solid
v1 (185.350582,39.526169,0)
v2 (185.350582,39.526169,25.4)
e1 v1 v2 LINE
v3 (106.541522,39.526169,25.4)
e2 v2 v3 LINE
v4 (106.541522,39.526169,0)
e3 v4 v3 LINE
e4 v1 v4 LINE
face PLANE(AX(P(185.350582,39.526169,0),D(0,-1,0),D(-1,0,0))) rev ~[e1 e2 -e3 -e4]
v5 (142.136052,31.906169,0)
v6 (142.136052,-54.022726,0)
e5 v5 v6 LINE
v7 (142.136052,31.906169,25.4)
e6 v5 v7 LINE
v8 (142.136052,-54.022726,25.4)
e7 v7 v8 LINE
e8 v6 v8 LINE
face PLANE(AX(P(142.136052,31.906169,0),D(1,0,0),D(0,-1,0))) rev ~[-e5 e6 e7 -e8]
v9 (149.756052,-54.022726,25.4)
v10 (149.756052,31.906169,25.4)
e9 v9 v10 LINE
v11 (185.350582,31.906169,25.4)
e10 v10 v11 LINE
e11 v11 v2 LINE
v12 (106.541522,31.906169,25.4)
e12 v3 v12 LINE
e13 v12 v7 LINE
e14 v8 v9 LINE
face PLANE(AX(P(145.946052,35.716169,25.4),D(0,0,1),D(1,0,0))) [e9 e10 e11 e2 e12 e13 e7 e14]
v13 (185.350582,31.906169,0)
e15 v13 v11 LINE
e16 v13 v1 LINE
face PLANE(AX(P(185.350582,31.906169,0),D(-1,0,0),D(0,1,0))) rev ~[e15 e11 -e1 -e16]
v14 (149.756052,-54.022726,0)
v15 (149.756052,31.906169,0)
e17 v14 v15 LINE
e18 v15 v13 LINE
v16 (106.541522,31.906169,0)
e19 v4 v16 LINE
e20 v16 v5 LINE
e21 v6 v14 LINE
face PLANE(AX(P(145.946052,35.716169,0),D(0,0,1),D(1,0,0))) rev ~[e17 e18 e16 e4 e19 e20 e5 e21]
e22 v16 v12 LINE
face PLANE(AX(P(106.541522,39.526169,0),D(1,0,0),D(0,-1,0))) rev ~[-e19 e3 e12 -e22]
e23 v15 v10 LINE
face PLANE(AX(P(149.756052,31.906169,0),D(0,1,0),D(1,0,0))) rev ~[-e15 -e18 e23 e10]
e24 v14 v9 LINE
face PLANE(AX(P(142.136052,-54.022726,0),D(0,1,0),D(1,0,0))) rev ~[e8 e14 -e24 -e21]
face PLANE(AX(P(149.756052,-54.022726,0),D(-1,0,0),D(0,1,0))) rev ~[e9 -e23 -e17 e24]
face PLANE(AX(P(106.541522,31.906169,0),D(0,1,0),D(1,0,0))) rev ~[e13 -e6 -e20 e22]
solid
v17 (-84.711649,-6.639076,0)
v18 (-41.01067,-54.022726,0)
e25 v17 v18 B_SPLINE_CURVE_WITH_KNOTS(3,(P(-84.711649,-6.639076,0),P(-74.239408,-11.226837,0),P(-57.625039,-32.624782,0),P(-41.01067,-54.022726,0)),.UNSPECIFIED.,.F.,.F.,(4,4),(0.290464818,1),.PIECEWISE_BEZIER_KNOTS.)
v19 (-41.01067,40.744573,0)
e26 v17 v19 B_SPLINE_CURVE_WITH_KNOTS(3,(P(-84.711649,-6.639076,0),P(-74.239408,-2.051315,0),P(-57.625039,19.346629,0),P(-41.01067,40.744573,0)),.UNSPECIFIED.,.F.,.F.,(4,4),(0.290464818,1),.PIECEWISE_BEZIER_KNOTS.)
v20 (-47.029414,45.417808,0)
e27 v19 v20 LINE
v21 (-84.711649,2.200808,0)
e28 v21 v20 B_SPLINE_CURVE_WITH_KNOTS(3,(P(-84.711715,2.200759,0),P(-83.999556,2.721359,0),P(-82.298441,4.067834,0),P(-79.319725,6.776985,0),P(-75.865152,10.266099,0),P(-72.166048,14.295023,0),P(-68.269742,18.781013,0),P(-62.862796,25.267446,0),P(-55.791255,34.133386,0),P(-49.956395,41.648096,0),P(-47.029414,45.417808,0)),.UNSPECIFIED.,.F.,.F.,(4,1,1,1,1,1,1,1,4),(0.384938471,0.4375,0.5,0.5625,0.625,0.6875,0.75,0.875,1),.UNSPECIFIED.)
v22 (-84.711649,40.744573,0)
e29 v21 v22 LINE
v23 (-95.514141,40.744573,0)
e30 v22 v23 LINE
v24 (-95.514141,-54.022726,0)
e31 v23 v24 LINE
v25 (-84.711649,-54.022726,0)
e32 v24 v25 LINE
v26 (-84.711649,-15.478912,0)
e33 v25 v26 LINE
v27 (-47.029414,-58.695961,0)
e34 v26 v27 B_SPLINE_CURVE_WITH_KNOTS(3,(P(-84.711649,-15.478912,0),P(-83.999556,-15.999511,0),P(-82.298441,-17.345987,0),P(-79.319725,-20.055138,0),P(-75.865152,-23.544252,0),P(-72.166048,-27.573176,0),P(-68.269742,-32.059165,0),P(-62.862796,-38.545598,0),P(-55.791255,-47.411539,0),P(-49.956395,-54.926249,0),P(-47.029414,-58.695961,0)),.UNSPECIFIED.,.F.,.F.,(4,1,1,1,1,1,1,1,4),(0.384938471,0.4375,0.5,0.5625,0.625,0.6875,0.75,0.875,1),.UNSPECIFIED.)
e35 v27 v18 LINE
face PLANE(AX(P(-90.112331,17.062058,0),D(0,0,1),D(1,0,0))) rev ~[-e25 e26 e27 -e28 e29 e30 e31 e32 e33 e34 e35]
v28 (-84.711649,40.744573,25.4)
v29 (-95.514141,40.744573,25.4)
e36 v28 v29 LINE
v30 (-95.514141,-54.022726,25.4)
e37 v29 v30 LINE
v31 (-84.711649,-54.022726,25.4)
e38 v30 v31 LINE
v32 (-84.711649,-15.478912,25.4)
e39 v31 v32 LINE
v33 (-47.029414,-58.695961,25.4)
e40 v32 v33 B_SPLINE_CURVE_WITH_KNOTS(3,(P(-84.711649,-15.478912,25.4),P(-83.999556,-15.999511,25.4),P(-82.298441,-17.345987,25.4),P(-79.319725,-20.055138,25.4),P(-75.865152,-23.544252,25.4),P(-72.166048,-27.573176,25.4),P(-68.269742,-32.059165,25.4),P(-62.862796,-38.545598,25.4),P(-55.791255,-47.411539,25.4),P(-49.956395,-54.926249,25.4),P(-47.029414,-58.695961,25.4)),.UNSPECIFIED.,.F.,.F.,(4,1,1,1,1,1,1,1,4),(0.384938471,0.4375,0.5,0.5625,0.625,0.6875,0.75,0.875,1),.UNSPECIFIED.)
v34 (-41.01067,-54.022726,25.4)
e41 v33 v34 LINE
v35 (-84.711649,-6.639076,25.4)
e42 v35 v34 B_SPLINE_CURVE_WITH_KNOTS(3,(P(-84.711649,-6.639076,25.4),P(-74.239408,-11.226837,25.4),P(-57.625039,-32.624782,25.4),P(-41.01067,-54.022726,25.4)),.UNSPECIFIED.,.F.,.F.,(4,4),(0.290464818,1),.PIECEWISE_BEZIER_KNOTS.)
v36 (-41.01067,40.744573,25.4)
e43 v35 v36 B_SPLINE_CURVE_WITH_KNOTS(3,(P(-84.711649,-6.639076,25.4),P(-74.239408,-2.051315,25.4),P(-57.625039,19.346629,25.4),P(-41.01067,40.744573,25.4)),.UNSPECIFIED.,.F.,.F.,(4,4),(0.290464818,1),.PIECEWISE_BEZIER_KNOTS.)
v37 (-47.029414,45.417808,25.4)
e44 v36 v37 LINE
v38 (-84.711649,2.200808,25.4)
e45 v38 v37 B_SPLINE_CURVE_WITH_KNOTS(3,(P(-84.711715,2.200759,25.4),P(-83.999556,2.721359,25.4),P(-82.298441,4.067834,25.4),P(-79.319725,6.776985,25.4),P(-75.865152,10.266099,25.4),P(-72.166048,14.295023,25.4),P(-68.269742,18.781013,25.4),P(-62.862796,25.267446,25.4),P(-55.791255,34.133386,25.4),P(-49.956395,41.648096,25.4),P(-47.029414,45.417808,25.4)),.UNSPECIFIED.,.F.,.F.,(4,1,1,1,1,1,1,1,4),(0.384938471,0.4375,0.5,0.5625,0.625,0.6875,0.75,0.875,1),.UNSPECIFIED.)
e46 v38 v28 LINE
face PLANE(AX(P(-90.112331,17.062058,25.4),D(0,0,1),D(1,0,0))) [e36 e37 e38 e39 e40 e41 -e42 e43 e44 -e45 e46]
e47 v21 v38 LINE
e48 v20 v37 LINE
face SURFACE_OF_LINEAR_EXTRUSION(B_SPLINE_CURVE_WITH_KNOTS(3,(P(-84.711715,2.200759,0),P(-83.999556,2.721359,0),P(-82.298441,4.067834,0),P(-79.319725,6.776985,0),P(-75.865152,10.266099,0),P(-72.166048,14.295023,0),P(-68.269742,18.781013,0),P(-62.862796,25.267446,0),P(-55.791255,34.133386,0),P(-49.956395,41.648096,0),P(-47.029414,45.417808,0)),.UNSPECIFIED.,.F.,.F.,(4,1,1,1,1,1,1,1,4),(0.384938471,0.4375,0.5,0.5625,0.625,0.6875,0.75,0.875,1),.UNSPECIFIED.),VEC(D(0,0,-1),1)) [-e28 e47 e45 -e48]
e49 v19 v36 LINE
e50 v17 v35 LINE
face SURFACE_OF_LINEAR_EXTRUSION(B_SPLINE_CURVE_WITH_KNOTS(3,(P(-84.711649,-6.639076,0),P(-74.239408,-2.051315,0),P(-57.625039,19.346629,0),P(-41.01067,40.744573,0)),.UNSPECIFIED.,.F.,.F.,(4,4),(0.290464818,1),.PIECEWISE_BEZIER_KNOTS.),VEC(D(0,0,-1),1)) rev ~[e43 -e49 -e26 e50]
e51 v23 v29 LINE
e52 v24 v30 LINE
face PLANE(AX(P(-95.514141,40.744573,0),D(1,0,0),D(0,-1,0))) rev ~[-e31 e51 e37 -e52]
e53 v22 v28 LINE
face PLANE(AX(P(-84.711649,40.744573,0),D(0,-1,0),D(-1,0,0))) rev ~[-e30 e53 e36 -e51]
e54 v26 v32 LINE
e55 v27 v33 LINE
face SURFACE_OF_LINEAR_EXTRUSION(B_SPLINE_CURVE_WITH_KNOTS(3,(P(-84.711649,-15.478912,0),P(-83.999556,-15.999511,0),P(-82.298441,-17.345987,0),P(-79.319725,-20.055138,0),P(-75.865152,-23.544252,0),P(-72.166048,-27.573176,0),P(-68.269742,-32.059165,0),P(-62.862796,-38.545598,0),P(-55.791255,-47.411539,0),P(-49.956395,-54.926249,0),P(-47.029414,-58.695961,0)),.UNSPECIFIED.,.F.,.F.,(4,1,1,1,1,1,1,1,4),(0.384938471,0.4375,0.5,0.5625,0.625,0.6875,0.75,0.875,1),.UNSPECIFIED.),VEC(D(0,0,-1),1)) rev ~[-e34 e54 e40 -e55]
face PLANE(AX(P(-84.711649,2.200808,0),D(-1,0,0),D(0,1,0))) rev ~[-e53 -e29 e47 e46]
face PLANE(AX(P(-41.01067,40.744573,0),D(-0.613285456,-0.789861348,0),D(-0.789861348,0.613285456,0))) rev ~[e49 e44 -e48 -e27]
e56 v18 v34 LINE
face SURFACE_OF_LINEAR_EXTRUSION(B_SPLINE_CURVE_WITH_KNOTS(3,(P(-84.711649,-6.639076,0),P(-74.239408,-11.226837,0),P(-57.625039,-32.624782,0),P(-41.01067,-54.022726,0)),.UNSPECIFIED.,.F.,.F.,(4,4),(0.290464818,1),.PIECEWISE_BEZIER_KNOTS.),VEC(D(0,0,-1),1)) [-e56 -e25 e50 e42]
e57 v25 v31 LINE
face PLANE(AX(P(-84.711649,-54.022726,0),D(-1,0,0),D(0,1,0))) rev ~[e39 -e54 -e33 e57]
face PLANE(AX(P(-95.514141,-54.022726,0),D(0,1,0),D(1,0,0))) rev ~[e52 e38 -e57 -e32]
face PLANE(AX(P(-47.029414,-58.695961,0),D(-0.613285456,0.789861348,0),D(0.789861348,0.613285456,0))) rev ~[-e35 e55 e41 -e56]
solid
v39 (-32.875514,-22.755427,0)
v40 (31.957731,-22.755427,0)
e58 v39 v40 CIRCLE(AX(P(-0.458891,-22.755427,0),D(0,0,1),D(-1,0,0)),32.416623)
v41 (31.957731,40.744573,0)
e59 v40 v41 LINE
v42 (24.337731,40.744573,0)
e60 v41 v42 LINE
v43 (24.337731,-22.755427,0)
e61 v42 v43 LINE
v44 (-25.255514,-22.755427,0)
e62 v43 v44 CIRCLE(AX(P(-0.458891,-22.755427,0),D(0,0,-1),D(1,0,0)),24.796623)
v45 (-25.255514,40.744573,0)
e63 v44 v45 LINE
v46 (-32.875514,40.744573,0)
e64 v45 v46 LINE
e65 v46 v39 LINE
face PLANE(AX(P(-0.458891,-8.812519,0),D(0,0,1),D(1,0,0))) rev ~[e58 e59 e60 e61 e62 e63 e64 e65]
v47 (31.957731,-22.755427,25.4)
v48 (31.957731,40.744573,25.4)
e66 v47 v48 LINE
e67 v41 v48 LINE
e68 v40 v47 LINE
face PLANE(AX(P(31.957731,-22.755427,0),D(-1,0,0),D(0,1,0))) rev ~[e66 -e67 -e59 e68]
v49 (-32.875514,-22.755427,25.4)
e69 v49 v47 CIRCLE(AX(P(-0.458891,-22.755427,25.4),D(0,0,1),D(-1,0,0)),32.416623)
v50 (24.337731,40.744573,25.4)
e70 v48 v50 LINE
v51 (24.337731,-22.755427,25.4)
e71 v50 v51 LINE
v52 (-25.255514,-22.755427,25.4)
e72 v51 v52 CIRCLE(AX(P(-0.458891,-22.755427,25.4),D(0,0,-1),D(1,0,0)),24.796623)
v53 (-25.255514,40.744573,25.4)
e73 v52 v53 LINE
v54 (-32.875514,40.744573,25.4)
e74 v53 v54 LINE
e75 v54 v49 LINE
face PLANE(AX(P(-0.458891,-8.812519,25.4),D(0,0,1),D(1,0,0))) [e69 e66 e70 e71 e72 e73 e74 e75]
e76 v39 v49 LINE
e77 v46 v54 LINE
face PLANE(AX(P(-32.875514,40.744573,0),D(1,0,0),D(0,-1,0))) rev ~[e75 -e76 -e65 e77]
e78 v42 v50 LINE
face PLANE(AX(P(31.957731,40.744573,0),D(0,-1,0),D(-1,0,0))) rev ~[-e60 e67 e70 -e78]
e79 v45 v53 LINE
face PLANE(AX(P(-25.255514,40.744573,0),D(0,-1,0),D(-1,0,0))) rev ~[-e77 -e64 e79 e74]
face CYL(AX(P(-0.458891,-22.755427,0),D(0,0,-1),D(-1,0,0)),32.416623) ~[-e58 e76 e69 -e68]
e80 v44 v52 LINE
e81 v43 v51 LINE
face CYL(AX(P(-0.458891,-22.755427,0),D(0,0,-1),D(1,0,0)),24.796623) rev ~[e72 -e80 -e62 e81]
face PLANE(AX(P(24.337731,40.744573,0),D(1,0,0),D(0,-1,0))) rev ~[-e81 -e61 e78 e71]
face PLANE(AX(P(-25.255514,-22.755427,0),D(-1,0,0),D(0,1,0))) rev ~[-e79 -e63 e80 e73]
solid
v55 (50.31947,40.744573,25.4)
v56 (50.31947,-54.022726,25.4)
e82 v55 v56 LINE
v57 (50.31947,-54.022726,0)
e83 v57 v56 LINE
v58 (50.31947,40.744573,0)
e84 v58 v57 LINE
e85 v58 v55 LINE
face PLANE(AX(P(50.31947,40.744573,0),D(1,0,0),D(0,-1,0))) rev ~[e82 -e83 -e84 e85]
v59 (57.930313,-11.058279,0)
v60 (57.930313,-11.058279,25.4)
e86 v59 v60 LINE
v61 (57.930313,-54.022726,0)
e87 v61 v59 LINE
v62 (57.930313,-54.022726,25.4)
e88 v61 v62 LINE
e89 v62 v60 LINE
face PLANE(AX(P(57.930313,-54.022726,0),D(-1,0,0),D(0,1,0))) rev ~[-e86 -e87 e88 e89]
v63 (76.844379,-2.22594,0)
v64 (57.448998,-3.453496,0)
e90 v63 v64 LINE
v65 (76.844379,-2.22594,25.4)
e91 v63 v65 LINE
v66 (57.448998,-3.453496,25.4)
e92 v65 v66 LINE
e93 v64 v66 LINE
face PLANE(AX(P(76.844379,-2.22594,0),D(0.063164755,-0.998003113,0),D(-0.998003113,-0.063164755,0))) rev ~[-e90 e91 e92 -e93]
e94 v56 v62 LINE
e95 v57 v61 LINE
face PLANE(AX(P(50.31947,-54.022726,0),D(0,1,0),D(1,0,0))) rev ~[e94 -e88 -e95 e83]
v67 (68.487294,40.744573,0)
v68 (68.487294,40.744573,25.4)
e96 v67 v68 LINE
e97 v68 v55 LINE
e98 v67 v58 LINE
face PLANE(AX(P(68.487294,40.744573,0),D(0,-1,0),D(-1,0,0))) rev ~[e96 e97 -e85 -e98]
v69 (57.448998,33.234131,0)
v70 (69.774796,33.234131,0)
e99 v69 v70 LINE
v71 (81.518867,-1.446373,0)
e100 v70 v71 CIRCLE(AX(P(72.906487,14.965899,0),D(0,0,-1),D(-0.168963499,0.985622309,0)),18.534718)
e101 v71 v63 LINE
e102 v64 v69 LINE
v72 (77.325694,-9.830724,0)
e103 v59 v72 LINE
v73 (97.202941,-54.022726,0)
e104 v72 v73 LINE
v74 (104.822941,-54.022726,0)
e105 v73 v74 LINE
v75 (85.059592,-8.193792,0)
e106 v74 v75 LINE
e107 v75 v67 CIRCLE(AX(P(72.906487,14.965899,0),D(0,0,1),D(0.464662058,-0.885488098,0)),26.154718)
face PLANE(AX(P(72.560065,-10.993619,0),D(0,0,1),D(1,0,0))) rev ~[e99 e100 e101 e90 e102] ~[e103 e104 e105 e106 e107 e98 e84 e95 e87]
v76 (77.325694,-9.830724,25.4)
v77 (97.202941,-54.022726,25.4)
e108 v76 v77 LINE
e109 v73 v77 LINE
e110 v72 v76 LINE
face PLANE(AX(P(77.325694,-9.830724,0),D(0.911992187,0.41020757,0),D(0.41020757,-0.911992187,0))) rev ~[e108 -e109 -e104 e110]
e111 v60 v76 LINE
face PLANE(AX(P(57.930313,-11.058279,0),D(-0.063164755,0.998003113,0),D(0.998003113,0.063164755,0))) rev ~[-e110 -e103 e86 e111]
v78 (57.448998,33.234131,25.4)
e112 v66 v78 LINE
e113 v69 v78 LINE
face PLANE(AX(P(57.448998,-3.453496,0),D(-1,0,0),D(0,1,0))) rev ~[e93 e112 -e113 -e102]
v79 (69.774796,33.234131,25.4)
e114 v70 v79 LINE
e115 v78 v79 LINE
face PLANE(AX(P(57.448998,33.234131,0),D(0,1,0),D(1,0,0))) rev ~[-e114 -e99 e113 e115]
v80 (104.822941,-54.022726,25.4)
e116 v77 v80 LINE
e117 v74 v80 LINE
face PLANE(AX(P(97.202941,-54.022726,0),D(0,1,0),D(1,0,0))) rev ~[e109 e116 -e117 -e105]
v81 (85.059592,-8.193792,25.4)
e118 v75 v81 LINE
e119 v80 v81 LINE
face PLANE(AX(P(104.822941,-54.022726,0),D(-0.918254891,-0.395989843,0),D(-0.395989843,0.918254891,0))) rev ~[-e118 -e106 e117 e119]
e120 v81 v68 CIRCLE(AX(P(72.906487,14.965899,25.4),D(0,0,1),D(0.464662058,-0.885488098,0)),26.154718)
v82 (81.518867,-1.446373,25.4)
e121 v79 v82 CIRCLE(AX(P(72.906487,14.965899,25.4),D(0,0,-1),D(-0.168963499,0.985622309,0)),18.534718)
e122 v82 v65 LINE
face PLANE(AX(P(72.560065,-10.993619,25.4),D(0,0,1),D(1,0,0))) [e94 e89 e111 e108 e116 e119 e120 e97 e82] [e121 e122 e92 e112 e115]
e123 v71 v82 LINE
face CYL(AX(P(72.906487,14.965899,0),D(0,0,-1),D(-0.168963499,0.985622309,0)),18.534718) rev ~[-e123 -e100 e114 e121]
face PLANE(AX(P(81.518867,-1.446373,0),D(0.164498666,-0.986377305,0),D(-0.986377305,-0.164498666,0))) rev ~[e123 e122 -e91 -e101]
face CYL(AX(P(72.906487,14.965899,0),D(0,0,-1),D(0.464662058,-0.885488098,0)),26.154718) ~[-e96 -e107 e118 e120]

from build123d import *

# Parameters (mm, degrees)
F1_DEPTH = 25.4


# Not quite as in the source:
# - ends of sketch curves that miss each other by under 0.0002 mm in the source are joined
# - the dataset's text gives a spline's control points without its knots; the knots are read off the source's solid


with BuildPart() as f1:
    # F0 (on Top) → F1 (new body)
    with BuildSketch(Plane.XY):
        with BuildLine():
            Line((-84.7116485238, 40.7445728779), (-95.5141410232, 40.7445728779))
            Line((-95.5141410232, 40.7445728779), (-95.5141410232, -6.6390763968))
            add(Edge.make_bspline(
                [(-95.5141410232, -6.6390763968), (-92.2564229583, -5.7000227681), (-88.9987048935, -4.7609691395), (-84.7116485238, -6.6390763968)],
                knots=[0, 0, 0, 0, 0.2904648184, 0.2904648184, 0.2904648184, 0.2904648184], degree=3))
            Line((-84.7116485238, -6.6390763968), (-84.7116485238, 2.2007589152))
            Line((-84.7116485238, 2.2007589152), (-84.7116485238, 40.7445728779))
        make_face()
        with BuildLine():
            add(Edge.make_bspline(
                [(-95.5141410232, -6.6390763968), (-92.2564229583, -7.5781300255), (-88.9987048935, -8.5171836542), (-84.7116485238, -6.6390763968)],
                knots=[0, 0, 0, 0, 0.2904648184, 0.2904648184, 0.2904648184, 0.2904648184], degree=3))
            Line((-95.5141410232, -6.6390763968), (-95.5141410232, -54.0227256715))
            Line((-95.5141410232, -54.0227256715), (-84.7116485238, -54.0227256715))
            Line((-84.7116485238, -54.0227256715), (-84.7116485238, -15.4789117092))
            Line((-84.7116485238, -15.4789117092), (-84.7116485238, -6.6390763968))
        make_face()
        with BuildLine():
            add(Edge.make_bspline(
                [(-95.5141410232, -6.6390763968), (-92.2564229583, -5.7000227681), (-88.9987048935, -4.7609691395), (-84.7116485238, -6.6390763968)],
                knots=[0, 0, 0, 0, 0.2904648184, 0.2904648184, 0.2904648184, 0.2904648184], degree=3))
            add(Edge.make_bspline(
                [(-95.5141410232, -6.6390763968), (-92.2564229583, -7.5781300255), (-88.9987048935, -8.5171836542), (-84.7116485238, -6.6390763968)],
                knots=[0, 0, 0, 0, 0.2904648184, 0.2904648184, 0.2904648184, 0.2904648184], degree=3))
        make_face()
        with BuildLine():
            add(Edge.make_bspline(
                [(-84.7117154486, 2.2007589152), (-83.9995557093, 2.721358536), (-82.2984407254, 4.0678338376), (-79.3197247041, 6.7769854886), (-75.8651516776, 10.2660987459), (-72.166048126, 14.2950229097), (-68.2697421496, 18.7810126405), (-62.8627961927, 25.267445643), (-55.7912554843, 34.1333862174), (-49.9563950251, 41.6480964378), (-47.0294138372, 45.4178080531)],
                knots=[0.3849384709, 0.3849384709, 0.3849384709, 0.3849384709, 0.4375, 0.5, 0.5625, 0.625, 0.6875, 0.75, 0.875, 1, 1, 1, 1], degree=3))
            Line((-84.7117154486, 2.2007589152), (-84.7116485238, -6.6390763968))
            add(Edge.make_bspline(
                [(-84.7116485238, -6.6390763968), (-74.2394084221, -2.0513153692), (-57.625039393, 19.3466287543), (-41.0106703639, 40.7445728779)],
                knots=[0.2904648184, 0.2904648184, 0.2904648184, 0.2904648184, 1, 1, 1, 1], degree=3))
            Line((-41.0106703639, 40.7445728779), (-47.0294138372, 45.4178080531))
        make_face()
        with BuildLine():
            add(Edge.make_bspline(
                [(-84.7116485238, -6.6390763968), (-74.2394084221, -11.2268374245), (-57.625039393, -32.624781548), (-41.0106703639, -54.0227256715)],
                knots=[0.2904648184, 0.2904648184, 0.2904648184, 0.2904648184, 1, 1, 1, 1], degree=3))
            Line((-84.7116485238, -6.6390763968), (-84.7116485238, -15.4789117092))
            add(Edge.make_bspline(
                [(-84.7116485238, -15.4789117092), (-83.999555709, -15.9995113299), (-82.2984407252, -17.3459866313), (-79.3197247041, -20.0551382822), (-75.8651516776, -23.5442515395), (-72.166048126, -27.5731757034), (-68.2697421496, -32.0591654341), (-62.8627961927, -38.5455984366), (-55.7912554843, -47.411539011), (-49.9563950251, -54.9262492315), (-47.0294138372, -58.6959608468)],
                knots=[0.3849384709, 0.3849384709, 0.3849384709, 0.3849384709, 0.4375, 0.5, 0.5625, 0.625, 0.6875, 0.75, 0.875, 1, 1, 1, 1], degree=3))
            Line((-47.0294138372, -58.6959608468), (-41.0106703639, -54.0227256715))
        make_face()
    extrude(amount=F1_DEPTH)


with BuildPart() as f1b:
    # F0 (on Top) → F1, piece 2 (new body)
    with BuildSketch(Plane.XY):
        with BuildLine():
            Line((-25.2555142003, -22.7554271221), (-25.2555142003, 40.7445728779))
            Line((-25.2555142003, 40.7445728779), (-32.8755142003, 40.7445728779))
            Line((-32.8755142003, 40.7445728779), (-32.8755142003, -22.7554271221))
            ThreePointArc((-32.8755142003, -22.7554271221), (-0.458891395, -55.1720499274), (31.9577314103, -22.7554271221))
            Line((31.9577314103, -22.7554271221), (31.9577314103, 40.7445728779))
            Line((31.9577314103, 40.7445728779), (24.3377314103, 40.7445728779))
            Line((24.3377314103, 40.7445728779), (24.3377314103, -22.7554271221))
            ThreePointArc((24.3377314103, -22.7554271221), (-0.458891395, -47.5520499274), (-25.2555142003, -22.7554271221))
        make_face()
    extrude(amount=F1_DEPTH)


with BuildPart() as f1c:
    # F0 (on Top) → F1, piece 3 (new body)
    with BuildSketch(Plane.XY):
        with BuildLine():
            Line((68.4872940183, 40.7445728779), (50.3194704652, 40.7445728779))
            Line((50.3194704652, 40.7445728779), (50.3194704652, -54.0227256715))
            Line((50.3194704652, -54.0227256715), (57.9303130507, -54.0227256715))
            Line((57.9303130507, -54.0227256715), (57.9303130507, -11.0582793131))
            Line((57.9303130507, -11.0582793131), (77.325694263, -9.8307235166))
            Line((77.325694263, -9.8307235166), (97.2029411244, -54.0227256715))
            Line((97.2029411244, -54.0227256715), (104.8229411244, -54.0227256715))
            Line((104.8229411244, -54.0227256715), (85.059591811, -8.1937922423))
            ThreePointArc((85.059591811, -8.1937922423), (97.6793396869, 23.3548819617), (68.4872940183, 40.7445728779))
        make_face()
        with BuildLine():
            Line((57.4489976161, 33.2341308831), (69.7747958795, 33.2341308831))
            ThreePointArc((69.7747958795, 33.2341308831), (90.4619367109, 20.9108086643), (81.5188669265, -1.4463729362))
            Line((81.5188669265, -1.4463729362), (76.8443788283, -2.225939795))
            Line((76.8443788283, -2.225939795), (57.4489976161, -3.4534955915))
            Line((57.4489976161, -3.4534955915), (57.4489976161, 33.2341308831))
        make_face(mode=Mode.SUBTRACT)
    extrude(amount=F1_DEPTH)


with BuildPart() as f1d:
    # F0 (on Top) → F1, piece 4 (new body)
    with BuildSketch(Plane.XY):
        Polygon((185.3505820036, 39.5261689079), (106.5415218472, 39.5261689079), (106.5415218472, 31.9061689079), (142.1360519254, 31.9061689079), (145.9460519254, 31.9061689079), (149.7560519254, 31.9061689079), (185.3505820036, 31.9061689079), align=None)
        Polygon((145.9460519254, 31.9061689079), (142.1360519254, 31.9061689079), (142.1360519254, -54.0227256715), (145.9460519254, -54.0227256715), (149.7560519254, -54.0227256715), (149.7560519254, 31.9061689079), align=None)
    extrude(amount=F1_DEPTH)


solid = Compound([f1.part, f1b.part, f1c.part, f1d.part])
